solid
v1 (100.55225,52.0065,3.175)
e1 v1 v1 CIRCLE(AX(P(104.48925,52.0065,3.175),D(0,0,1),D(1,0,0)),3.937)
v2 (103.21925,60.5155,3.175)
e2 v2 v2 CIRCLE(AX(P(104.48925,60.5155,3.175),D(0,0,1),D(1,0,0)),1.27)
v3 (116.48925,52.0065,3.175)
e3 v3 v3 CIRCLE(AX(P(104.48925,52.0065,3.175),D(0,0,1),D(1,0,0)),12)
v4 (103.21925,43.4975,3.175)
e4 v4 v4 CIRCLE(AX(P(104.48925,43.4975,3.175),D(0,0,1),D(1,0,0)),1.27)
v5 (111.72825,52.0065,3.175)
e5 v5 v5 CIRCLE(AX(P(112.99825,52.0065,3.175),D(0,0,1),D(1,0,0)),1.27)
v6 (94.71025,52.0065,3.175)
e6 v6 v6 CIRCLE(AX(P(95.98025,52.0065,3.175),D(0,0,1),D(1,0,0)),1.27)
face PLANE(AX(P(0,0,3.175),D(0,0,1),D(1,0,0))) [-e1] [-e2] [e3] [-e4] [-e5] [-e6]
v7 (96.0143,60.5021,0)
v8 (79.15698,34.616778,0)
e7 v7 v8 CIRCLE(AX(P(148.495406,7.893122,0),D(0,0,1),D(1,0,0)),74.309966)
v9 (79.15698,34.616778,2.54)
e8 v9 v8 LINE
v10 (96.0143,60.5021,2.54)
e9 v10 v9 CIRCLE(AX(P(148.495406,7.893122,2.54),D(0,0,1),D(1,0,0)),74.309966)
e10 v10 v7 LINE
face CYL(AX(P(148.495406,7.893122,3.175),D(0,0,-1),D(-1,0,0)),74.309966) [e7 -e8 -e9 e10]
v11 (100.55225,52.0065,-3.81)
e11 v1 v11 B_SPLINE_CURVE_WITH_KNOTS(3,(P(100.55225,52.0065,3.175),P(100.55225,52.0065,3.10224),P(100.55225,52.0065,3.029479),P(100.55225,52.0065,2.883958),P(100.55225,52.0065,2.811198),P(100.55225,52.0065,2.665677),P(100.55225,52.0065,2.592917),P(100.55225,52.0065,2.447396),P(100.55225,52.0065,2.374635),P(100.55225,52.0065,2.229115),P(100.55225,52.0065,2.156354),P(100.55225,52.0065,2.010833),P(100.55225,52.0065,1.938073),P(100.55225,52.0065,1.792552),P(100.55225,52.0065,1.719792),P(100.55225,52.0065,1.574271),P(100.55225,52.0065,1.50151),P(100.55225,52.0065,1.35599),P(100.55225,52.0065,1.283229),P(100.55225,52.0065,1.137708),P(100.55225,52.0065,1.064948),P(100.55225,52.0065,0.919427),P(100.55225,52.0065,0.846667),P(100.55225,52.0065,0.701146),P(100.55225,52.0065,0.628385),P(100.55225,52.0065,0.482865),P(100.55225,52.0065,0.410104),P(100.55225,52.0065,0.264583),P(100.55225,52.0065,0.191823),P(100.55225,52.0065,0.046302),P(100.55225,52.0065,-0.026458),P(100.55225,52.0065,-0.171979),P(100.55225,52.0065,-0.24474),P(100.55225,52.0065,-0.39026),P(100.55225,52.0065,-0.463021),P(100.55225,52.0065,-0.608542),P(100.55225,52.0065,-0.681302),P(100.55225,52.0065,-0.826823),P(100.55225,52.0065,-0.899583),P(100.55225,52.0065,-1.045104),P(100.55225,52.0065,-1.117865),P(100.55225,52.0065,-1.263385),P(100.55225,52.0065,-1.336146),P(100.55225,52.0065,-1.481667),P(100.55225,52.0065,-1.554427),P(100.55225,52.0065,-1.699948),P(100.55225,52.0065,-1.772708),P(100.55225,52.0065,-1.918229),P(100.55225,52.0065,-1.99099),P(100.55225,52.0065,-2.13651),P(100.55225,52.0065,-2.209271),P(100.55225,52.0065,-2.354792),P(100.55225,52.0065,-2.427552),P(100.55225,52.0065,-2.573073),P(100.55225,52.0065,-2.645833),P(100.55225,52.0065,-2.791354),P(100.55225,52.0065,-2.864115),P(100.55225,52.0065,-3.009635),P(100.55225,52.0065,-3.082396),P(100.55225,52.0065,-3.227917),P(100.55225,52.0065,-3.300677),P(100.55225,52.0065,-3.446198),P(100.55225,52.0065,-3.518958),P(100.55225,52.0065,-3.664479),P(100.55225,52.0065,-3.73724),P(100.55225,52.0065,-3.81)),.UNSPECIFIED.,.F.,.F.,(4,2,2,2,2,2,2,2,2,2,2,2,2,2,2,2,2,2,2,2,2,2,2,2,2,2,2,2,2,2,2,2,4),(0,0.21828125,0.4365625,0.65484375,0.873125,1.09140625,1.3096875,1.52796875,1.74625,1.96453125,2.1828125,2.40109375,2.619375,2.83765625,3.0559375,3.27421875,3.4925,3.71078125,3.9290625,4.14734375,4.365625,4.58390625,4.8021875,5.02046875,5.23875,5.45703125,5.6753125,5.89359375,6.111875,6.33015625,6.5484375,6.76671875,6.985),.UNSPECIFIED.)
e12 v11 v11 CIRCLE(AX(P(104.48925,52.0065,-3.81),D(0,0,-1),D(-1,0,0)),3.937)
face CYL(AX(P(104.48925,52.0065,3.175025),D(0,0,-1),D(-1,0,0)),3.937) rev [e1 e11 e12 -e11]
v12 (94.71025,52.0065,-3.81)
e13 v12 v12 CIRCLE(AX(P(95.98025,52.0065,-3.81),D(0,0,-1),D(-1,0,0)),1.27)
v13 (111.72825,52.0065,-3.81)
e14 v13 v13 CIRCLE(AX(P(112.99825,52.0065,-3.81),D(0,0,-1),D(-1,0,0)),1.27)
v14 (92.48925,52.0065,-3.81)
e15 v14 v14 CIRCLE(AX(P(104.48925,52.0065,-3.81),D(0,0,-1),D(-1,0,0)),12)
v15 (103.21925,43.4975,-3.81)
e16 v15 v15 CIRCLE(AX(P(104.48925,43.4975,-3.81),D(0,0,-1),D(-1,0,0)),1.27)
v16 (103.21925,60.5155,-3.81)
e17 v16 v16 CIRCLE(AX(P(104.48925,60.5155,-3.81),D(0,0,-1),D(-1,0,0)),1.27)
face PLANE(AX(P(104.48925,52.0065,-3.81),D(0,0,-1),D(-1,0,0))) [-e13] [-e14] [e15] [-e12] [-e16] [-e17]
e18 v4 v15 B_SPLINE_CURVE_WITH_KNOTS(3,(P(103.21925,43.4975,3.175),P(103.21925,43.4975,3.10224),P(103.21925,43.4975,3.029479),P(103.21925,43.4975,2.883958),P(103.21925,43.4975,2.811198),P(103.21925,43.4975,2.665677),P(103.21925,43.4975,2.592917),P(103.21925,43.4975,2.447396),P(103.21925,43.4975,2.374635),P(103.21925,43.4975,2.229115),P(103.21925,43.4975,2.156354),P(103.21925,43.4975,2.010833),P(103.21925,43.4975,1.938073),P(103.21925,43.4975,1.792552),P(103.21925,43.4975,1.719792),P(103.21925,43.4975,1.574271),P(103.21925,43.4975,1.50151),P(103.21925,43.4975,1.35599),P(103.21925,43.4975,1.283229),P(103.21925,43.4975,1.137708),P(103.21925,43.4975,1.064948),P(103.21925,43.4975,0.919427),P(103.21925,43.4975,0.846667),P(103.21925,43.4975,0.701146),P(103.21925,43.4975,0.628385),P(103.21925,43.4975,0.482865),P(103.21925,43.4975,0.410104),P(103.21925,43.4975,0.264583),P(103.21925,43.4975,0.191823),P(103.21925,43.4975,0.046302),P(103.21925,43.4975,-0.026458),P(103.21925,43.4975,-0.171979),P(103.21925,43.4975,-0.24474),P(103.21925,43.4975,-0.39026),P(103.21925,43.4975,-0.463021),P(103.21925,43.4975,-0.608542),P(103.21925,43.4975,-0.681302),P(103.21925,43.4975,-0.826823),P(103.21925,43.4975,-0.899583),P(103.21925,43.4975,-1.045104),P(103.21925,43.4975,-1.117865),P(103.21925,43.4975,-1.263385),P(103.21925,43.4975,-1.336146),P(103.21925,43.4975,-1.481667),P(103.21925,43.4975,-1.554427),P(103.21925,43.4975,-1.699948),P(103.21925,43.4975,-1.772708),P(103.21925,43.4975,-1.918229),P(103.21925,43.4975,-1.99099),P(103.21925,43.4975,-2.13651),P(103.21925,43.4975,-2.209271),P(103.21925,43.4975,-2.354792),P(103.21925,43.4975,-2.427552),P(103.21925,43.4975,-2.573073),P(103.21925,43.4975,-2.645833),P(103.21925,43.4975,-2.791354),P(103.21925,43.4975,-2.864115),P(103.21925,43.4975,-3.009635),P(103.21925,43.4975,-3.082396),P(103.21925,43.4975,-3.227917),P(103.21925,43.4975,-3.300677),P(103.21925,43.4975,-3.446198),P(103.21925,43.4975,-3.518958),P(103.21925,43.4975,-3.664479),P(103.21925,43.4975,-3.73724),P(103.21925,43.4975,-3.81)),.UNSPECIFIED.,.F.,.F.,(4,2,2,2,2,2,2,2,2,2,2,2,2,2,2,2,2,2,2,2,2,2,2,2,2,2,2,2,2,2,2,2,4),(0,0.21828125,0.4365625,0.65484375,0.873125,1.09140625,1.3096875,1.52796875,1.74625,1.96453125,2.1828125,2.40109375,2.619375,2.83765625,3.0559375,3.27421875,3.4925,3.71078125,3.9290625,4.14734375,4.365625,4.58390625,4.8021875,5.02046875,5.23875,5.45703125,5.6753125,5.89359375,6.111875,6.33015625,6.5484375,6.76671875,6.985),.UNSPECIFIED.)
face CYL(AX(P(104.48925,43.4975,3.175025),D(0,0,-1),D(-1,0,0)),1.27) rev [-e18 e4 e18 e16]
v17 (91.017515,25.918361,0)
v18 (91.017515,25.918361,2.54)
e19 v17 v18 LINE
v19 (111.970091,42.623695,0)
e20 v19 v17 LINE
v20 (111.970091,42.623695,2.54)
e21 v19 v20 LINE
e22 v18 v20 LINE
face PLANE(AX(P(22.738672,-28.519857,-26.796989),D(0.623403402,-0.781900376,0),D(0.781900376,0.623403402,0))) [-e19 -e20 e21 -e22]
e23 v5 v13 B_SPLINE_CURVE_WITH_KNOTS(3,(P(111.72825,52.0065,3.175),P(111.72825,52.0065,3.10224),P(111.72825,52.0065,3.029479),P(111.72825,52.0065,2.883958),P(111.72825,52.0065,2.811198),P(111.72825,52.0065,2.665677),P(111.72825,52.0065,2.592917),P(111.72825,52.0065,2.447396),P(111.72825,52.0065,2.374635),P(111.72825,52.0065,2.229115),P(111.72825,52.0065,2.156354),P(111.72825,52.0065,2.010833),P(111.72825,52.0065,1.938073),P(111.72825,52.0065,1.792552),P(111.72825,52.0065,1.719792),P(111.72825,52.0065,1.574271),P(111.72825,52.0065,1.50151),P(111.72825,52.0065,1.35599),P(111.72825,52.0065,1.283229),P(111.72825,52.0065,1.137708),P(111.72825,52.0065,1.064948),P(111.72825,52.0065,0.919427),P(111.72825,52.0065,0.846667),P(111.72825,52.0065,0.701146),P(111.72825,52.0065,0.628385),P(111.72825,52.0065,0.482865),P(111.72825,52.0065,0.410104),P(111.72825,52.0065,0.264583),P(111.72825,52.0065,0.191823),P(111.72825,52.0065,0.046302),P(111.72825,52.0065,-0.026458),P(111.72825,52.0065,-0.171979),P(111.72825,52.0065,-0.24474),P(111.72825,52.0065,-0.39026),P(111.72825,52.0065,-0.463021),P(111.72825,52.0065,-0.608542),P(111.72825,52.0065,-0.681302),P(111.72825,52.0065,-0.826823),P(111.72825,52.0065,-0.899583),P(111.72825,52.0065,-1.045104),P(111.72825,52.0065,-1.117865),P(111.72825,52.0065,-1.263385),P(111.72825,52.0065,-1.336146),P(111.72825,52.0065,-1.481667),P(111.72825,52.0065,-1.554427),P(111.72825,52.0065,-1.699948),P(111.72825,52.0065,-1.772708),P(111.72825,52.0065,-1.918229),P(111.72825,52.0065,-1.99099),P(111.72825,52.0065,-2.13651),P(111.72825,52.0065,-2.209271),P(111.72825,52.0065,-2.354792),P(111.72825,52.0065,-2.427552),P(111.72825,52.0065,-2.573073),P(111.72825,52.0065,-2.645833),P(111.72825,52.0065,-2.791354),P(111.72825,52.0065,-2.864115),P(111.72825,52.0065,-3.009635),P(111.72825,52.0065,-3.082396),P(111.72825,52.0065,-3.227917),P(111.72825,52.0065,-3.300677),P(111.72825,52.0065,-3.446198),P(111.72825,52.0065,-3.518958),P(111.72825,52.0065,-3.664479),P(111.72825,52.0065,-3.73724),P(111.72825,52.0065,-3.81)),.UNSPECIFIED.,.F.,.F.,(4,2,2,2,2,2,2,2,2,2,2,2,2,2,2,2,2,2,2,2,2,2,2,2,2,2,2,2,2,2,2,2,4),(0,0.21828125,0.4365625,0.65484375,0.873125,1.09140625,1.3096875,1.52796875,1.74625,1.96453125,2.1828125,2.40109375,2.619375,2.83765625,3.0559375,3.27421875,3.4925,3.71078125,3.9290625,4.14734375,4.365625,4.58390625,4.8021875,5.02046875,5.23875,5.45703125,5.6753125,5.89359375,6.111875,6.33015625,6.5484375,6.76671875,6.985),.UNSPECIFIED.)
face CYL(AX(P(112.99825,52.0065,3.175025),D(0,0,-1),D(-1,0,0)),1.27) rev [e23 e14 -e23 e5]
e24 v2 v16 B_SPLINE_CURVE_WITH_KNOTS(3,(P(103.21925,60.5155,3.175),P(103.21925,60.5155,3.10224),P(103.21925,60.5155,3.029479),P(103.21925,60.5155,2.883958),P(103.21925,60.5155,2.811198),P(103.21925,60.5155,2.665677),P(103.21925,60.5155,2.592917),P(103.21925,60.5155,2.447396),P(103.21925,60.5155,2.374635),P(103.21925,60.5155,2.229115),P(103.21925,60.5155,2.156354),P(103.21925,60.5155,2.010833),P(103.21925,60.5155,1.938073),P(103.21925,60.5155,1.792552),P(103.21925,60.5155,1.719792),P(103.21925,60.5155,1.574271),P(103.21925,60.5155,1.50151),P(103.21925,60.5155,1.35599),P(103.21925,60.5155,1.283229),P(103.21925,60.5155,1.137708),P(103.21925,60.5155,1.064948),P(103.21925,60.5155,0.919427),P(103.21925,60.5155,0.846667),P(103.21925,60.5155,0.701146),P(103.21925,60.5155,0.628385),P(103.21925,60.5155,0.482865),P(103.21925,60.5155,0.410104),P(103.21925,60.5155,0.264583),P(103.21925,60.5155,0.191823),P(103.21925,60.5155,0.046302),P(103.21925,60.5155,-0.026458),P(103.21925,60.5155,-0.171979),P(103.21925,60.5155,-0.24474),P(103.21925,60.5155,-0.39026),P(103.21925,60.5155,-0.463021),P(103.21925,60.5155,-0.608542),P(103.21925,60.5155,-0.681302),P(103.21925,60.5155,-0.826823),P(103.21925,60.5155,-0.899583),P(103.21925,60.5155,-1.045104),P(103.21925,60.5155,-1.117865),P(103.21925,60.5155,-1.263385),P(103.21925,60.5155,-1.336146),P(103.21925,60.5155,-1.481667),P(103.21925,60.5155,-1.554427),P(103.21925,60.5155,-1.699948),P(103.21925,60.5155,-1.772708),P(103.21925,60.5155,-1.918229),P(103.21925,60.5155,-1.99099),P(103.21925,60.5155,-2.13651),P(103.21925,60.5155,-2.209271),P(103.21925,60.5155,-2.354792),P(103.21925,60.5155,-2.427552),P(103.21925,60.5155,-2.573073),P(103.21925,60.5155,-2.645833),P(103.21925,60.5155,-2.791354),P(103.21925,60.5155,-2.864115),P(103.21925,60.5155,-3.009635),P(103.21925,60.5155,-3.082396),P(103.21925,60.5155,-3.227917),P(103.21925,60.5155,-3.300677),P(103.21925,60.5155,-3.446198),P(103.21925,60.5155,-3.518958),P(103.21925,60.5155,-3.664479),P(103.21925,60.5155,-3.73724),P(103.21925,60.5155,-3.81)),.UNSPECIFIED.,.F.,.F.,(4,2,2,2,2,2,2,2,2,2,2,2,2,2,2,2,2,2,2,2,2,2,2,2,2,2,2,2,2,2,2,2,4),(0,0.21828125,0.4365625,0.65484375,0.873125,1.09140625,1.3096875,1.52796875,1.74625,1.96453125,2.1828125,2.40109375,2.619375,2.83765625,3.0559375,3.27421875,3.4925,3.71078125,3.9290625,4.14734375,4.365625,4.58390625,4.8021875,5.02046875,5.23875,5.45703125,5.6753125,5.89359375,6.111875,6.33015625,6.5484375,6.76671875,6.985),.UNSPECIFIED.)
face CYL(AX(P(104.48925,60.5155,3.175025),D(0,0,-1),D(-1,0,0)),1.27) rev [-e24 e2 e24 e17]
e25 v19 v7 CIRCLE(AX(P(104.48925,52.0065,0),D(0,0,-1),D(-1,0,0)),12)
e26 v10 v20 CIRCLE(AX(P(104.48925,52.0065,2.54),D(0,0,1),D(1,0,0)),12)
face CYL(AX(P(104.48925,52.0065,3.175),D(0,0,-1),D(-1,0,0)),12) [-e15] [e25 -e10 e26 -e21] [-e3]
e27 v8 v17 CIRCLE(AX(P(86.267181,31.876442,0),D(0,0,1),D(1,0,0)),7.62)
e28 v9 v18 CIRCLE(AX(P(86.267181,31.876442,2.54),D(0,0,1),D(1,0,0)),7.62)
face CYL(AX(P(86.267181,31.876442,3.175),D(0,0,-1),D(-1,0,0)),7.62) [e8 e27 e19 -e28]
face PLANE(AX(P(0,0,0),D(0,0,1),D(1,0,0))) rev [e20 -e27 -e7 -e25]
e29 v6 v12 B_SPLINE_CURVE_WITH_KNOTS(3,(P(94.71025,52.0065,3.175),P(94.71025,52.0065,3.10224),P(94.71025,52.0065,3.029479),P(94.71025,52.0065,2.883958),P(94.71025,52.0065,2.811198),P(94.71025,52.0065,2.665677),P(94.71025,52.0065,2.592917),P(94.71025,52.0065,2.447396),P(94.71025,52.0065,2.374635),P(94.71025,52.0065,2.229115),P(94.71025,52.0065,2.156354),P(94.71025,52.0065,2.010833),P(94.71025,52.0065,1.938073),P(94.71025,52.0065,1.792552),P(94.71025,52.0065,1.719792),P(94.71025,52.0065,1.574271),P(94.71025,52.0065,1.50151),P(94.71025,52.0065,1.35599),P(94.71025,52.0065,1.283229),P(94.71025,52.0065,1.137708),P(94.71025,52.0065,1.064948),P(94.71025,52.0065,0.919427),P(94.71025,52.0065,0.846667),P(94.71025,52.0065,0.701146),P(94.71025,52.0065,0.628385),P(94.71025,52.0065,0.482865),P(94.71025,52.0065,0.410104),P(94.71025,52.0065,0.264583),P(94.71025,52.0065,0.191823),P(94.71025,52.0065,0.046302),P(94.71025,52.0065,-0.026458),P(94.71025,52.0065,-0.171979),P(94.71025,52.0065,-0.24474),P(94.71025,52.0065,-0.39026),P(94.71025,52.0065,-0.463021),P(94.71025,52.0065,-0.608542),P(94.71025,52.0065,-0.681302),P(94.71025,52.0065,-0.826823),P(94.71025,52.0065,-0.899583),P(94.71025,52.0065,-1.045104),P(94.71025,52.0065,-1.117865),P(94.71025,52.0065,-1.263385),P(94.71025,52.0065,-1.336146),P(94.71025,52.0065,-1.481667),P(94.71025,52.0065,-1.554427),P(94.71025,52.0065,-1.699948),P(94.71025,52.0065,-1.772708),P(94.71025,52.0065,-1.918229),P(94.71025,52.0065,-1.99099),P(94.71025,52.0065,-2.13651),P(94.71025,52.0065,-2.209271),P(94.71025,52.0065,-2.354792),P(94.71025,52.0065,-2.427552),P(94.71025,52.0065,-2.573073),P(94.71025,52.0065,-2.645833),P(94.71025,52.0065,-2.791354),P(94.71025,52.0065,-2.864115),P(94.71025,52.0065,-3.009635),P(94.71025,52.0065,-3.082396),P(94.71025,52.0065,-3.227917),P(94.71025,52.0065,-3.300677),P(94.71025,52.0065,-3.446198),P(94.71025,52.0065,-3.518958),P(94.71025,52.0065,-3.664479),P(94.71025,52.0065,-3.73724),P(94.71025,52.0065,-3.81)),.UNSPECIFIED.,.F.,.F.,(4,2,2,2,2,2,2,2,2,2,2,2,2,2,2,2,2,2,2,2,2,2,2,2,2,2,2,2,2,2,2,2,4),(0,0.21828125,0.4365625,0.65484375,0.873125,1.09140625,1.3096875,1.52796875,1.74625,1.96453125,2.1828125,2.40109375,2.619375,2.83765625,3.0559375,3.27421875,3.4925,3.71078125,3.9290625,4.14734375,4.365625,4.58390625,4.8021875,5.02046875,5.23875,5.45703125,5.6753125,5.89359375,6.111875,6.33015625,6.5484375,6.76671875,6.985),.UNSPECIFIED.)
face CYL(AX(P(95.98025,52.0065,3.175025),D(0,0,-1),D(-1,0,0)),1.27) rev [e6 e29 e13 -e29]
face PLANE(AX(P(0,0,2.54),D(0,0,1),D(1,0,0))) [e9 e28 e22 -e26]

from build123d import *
from build123d.topology import SkipClean

# Parameters (mm, degrees)
SKETCH1_R           = 12
BOSS_EXTRUDE1_DEPTH = 3.175
BOSS_EXTRUDE2_START = 3.81
SKETCH2_R           = 12
BOSS_EXTRUDE2_DEPTH = 3.81
SKETCH3_R           = 3.937
CUT_EXTRUDE1_DEPTH  = 134.099089527
SKETCH4_R           = 1.27
CUT_EXTRUDE2_DEPTH  = 134.099089527
CUT_EXTRUDE3_DEPTH  = 133.970273023
CUT_EXTRUDE4_START  = -0.635
CUT_EXTRUDE4_DEPTH  = 0.635
BOSS_EXTRUDE3_START = -2.54
BOSS_EXTRUDE3_DEPTH = 2.54


with BuildPart() as part:
    # Sketch1 → Boss-Extrude1 (new body)
    with BuildSketch(Plane.XY):
        with BuildLine():
            ThreePointArc((79.156979953, 34.616777747), (78.764409425, 33.207913627), (78.648230314, 31.75))
            Line((78.648230314, 31.75), (93.886132052, 31.75))
            ThreePointArc((93.886132052, 31.75), (93.886918896, 31.813218964), (93.887181183, 31.876442281))
            ThreePointArc((93.887181183, 31.876442281), (87.66085737, 39.367908538), (79.156979953, 34.616777747))
        make_face()
        with BuildLine():
            ThreePointArc((87.4395, 24.347161532), (88.598049964, 24.621688616), (89.699693339, 25.073335615))
            ThreePointArc((89.699693339, 25.073335615), (92.723044454, 27.828451492), (93.886132052, 31.75))
            Line((93.886132052, 31.75), (78.648230314, 31.75))
            ThreePointArc((78.648230314, 31.75), (79.141141445, 29.177561465), (80.476005529, 26.924))
            Line((80.476005529, 26.924), (87.4395, 26.924))
            Line((87.4395, 26.924), (87.4395, 24.347161532))
        make_face()
        with BuildLine():
            Line((87.4395, 26.924), (80.476005529, 26.924))
            ThreePointArc((80.476005529, 26.924), (82.246043304, 25.403819152), (84.393093646, 24.490496444))
            ThreePointArc((84.393093646, 24.490496444), (85.909052633, 24.264862685), (87.4395, 24.347161532))
            Line((87.4395, 24.347161532), (87.4395, 26.924))
        make_face()
        with BuildLine():
            ThreePointArc((89.699693339, 25.073335615), (94.483227873, 27.711788353), (99.06, 30.694537484))
            Line((99.06, 30.694537484), (99.06, 31.75))
            Line((99.06, 31.75), (93.886132052, 31.75))
            ThreePointArc((93.886132052, 31.75), (92.723044454, 27.828451492), (89.699693339, 25.073335615))
        make_face()
        with BuildLine():
            ThreePointArc((99.06, 30.694537484), (106.888760949, 37.054762789), (113.784062988, 44.416608597))
            ThreePointArc((113.784062988, 44.416608597), (96.436063978, 43.110085278), (96.014300162, 60.502100346))
            ThreePointArc((96.014300162, 60.502100346), (86.225733854, 48.445051897), (79.156979953, 34.616777747))
            ThreePointArc((79.156979953, 34.616777747), (87.66085737, 39.367908538), (93.887181183, 31.876442281))
            ThreePointArc((93.887181183, 31.876442281), (93.886918896, 31.813218964), (93.886132052, 31.75))
            Line((93.886132052, 31.75), (99.06, 31.75))
            Line((99.06, 31.75), (99.06, 30.694537484))
        make_face()
        with Locations((104.48925, 52.0065)):
            Circle(SKETCH1_R)
    extrude(amount=BOSS_EXTRUDE1_DEPTH)

    # Sketch2 → Boss-Extrude2 (add)
    with SkipClean():  # the faces are left unmerged after this step: merging them gives an invalid solid
        with BuildSketch(Plane(origin=(0, 0, 0), x_dir=(-1, 0, 0), z_dir=(0, 0, -1)).offset(BOSS_EXTRUDE2_START)):
            with Locations((-104.48925, 52.0065)):
                Circle(SKETCH2_R)
        extrude(amount=-BOSS_EXTRUDE2_DEPTH)

    # Sketch3 → Cut-Extrude1 (cut, through all)
    with SkipClean():  # the faces are left unmerged after this step: merging them gives an invalid solid
        with BuildSketch(Plane(origin=(0, 0, -3.81), x_dir=(-1, 0, 0), z_dir=(0, 0, -1))):
            with Locations((-104.48925, 52.0065)):
                Circle(SKETCH3_R)
        extrude(amount=-CUT_EXTRUDE1_DEPTH, mode=Mode.SUBTRACT)

    # Sketch4 → Cut-Extrude2 (cut, through all)
    with SkipClean():  # the faces are left unmerged after this step: merging them gives an invalid solid
        with BuildSketch(Plane(origin=(0, 0, -3.81), x_dir=(-1, 0, 0), z_dir=(0, 0, -1))):
            with Locations((-112.99825, 52.0065)):
                Circle(SKETCH4_R)
            with Locations((-95.98025, 52.0065)):
                Circle(SKETCH4_R)
            with Locations((-104.48925, 60.5155)):
                Circle(SKETCH4_R)
            with Locations((-104.48925, 43.4975)):
                Circle(SKETCH4_R)
        extrude(amount=-CUT_EXTRUDE2_DEPTH, mode=Mode.SUBTRACT)

    # Sketch5 → Cut-Extrude3 (cut, through all)
    with SkipClean():  # the faces are left unmerged after this step: merging them gives an invalid solid
        with BuildSketch(Plane(origin=(0, 0, 0), x_dir=(-1, 0, 0), z_dir=(0, 0, -1))):
            with BuildLine():
                ThreePointArc((-104.430493989, 40.006643845), (-109.606684651, 41.15238269), (-113.7840634, 44.4166091))
                ThreePointArc((-113.7840634, 44.4166091), (-102.758092767, 33.479680706), (-89.699693406, 25.073335649))
                ThreePointArc((-89.699693406, 25.073335649), (-92.462895691, 27.440507008), (-93.81346398, 30.819079549))
                ThreePointArc((-93.81346398, 30.819079549), (-97.397477458, 37.40567327), (-104.430493989, 40.006643845))
            make_face()
        extrude(amount=-CUT_EXTRUDE3_DEPTH, mode=Mode.SUBTRACT)
    add(part.part.scale(1), mode=Mode.REPLACE)  # the faces are merged on a copy

    # Sketch6 → Cut-Extrude4 (cut)
    with BuildSketch(Plane.XY.offset(3.175).offset(CUT_EXTRUDE4_START)):
        with BuildLine():
            ThreePointArc((96.014299675, 60.502099861), (86.225733771, 48.44505177), (79.156980092, 34.616778107))
            ThreePointArc((79.156980092, 34.616778107), (84.355854315, 24.500045491), (93.81346398, 30.819079549))
            ThreePointArc((93.81346398, 30.819079549), (97.397477458, 37.40567327), (104.430493989, 40.006643845))
            ThreePointArc((104.430493989, 40.006643845), (93.388711037, 47.448207038), (96.014299675, 60.502099861))
        make_face()
    extrude(amount=CUT_EXTRUDE4_DEPTH, mode=Mode.SUBTRACT)

    # Sketch7 → Boss-Extrude3 (add)
    with BuildSketch(Plane.XY.offset(2.54).offset(BOSS_EXTRUDE3_START)):
        with BuildLine():
            ThreePointArc((93.81346398, 30.819079549), (92.885787929, 28.100406696), (91.017515109, 25.918361416))
            Line((91.017515109, 25.918361416), (111.970090828, 42.623695489))
            ThreePointArc((111.970090828, 42.623695489), (108.424231015, 40.670013577), (104.430493989, 40.006643845))
            ThreePointArc((104.430493989, 40.006643845), (97.397477458, 37.40567327), (93.81346398, 30.819079549))
        make_face()
    extrude(amount=BOSS_EXTRUDE3_DEPTH)


solid = part.part
